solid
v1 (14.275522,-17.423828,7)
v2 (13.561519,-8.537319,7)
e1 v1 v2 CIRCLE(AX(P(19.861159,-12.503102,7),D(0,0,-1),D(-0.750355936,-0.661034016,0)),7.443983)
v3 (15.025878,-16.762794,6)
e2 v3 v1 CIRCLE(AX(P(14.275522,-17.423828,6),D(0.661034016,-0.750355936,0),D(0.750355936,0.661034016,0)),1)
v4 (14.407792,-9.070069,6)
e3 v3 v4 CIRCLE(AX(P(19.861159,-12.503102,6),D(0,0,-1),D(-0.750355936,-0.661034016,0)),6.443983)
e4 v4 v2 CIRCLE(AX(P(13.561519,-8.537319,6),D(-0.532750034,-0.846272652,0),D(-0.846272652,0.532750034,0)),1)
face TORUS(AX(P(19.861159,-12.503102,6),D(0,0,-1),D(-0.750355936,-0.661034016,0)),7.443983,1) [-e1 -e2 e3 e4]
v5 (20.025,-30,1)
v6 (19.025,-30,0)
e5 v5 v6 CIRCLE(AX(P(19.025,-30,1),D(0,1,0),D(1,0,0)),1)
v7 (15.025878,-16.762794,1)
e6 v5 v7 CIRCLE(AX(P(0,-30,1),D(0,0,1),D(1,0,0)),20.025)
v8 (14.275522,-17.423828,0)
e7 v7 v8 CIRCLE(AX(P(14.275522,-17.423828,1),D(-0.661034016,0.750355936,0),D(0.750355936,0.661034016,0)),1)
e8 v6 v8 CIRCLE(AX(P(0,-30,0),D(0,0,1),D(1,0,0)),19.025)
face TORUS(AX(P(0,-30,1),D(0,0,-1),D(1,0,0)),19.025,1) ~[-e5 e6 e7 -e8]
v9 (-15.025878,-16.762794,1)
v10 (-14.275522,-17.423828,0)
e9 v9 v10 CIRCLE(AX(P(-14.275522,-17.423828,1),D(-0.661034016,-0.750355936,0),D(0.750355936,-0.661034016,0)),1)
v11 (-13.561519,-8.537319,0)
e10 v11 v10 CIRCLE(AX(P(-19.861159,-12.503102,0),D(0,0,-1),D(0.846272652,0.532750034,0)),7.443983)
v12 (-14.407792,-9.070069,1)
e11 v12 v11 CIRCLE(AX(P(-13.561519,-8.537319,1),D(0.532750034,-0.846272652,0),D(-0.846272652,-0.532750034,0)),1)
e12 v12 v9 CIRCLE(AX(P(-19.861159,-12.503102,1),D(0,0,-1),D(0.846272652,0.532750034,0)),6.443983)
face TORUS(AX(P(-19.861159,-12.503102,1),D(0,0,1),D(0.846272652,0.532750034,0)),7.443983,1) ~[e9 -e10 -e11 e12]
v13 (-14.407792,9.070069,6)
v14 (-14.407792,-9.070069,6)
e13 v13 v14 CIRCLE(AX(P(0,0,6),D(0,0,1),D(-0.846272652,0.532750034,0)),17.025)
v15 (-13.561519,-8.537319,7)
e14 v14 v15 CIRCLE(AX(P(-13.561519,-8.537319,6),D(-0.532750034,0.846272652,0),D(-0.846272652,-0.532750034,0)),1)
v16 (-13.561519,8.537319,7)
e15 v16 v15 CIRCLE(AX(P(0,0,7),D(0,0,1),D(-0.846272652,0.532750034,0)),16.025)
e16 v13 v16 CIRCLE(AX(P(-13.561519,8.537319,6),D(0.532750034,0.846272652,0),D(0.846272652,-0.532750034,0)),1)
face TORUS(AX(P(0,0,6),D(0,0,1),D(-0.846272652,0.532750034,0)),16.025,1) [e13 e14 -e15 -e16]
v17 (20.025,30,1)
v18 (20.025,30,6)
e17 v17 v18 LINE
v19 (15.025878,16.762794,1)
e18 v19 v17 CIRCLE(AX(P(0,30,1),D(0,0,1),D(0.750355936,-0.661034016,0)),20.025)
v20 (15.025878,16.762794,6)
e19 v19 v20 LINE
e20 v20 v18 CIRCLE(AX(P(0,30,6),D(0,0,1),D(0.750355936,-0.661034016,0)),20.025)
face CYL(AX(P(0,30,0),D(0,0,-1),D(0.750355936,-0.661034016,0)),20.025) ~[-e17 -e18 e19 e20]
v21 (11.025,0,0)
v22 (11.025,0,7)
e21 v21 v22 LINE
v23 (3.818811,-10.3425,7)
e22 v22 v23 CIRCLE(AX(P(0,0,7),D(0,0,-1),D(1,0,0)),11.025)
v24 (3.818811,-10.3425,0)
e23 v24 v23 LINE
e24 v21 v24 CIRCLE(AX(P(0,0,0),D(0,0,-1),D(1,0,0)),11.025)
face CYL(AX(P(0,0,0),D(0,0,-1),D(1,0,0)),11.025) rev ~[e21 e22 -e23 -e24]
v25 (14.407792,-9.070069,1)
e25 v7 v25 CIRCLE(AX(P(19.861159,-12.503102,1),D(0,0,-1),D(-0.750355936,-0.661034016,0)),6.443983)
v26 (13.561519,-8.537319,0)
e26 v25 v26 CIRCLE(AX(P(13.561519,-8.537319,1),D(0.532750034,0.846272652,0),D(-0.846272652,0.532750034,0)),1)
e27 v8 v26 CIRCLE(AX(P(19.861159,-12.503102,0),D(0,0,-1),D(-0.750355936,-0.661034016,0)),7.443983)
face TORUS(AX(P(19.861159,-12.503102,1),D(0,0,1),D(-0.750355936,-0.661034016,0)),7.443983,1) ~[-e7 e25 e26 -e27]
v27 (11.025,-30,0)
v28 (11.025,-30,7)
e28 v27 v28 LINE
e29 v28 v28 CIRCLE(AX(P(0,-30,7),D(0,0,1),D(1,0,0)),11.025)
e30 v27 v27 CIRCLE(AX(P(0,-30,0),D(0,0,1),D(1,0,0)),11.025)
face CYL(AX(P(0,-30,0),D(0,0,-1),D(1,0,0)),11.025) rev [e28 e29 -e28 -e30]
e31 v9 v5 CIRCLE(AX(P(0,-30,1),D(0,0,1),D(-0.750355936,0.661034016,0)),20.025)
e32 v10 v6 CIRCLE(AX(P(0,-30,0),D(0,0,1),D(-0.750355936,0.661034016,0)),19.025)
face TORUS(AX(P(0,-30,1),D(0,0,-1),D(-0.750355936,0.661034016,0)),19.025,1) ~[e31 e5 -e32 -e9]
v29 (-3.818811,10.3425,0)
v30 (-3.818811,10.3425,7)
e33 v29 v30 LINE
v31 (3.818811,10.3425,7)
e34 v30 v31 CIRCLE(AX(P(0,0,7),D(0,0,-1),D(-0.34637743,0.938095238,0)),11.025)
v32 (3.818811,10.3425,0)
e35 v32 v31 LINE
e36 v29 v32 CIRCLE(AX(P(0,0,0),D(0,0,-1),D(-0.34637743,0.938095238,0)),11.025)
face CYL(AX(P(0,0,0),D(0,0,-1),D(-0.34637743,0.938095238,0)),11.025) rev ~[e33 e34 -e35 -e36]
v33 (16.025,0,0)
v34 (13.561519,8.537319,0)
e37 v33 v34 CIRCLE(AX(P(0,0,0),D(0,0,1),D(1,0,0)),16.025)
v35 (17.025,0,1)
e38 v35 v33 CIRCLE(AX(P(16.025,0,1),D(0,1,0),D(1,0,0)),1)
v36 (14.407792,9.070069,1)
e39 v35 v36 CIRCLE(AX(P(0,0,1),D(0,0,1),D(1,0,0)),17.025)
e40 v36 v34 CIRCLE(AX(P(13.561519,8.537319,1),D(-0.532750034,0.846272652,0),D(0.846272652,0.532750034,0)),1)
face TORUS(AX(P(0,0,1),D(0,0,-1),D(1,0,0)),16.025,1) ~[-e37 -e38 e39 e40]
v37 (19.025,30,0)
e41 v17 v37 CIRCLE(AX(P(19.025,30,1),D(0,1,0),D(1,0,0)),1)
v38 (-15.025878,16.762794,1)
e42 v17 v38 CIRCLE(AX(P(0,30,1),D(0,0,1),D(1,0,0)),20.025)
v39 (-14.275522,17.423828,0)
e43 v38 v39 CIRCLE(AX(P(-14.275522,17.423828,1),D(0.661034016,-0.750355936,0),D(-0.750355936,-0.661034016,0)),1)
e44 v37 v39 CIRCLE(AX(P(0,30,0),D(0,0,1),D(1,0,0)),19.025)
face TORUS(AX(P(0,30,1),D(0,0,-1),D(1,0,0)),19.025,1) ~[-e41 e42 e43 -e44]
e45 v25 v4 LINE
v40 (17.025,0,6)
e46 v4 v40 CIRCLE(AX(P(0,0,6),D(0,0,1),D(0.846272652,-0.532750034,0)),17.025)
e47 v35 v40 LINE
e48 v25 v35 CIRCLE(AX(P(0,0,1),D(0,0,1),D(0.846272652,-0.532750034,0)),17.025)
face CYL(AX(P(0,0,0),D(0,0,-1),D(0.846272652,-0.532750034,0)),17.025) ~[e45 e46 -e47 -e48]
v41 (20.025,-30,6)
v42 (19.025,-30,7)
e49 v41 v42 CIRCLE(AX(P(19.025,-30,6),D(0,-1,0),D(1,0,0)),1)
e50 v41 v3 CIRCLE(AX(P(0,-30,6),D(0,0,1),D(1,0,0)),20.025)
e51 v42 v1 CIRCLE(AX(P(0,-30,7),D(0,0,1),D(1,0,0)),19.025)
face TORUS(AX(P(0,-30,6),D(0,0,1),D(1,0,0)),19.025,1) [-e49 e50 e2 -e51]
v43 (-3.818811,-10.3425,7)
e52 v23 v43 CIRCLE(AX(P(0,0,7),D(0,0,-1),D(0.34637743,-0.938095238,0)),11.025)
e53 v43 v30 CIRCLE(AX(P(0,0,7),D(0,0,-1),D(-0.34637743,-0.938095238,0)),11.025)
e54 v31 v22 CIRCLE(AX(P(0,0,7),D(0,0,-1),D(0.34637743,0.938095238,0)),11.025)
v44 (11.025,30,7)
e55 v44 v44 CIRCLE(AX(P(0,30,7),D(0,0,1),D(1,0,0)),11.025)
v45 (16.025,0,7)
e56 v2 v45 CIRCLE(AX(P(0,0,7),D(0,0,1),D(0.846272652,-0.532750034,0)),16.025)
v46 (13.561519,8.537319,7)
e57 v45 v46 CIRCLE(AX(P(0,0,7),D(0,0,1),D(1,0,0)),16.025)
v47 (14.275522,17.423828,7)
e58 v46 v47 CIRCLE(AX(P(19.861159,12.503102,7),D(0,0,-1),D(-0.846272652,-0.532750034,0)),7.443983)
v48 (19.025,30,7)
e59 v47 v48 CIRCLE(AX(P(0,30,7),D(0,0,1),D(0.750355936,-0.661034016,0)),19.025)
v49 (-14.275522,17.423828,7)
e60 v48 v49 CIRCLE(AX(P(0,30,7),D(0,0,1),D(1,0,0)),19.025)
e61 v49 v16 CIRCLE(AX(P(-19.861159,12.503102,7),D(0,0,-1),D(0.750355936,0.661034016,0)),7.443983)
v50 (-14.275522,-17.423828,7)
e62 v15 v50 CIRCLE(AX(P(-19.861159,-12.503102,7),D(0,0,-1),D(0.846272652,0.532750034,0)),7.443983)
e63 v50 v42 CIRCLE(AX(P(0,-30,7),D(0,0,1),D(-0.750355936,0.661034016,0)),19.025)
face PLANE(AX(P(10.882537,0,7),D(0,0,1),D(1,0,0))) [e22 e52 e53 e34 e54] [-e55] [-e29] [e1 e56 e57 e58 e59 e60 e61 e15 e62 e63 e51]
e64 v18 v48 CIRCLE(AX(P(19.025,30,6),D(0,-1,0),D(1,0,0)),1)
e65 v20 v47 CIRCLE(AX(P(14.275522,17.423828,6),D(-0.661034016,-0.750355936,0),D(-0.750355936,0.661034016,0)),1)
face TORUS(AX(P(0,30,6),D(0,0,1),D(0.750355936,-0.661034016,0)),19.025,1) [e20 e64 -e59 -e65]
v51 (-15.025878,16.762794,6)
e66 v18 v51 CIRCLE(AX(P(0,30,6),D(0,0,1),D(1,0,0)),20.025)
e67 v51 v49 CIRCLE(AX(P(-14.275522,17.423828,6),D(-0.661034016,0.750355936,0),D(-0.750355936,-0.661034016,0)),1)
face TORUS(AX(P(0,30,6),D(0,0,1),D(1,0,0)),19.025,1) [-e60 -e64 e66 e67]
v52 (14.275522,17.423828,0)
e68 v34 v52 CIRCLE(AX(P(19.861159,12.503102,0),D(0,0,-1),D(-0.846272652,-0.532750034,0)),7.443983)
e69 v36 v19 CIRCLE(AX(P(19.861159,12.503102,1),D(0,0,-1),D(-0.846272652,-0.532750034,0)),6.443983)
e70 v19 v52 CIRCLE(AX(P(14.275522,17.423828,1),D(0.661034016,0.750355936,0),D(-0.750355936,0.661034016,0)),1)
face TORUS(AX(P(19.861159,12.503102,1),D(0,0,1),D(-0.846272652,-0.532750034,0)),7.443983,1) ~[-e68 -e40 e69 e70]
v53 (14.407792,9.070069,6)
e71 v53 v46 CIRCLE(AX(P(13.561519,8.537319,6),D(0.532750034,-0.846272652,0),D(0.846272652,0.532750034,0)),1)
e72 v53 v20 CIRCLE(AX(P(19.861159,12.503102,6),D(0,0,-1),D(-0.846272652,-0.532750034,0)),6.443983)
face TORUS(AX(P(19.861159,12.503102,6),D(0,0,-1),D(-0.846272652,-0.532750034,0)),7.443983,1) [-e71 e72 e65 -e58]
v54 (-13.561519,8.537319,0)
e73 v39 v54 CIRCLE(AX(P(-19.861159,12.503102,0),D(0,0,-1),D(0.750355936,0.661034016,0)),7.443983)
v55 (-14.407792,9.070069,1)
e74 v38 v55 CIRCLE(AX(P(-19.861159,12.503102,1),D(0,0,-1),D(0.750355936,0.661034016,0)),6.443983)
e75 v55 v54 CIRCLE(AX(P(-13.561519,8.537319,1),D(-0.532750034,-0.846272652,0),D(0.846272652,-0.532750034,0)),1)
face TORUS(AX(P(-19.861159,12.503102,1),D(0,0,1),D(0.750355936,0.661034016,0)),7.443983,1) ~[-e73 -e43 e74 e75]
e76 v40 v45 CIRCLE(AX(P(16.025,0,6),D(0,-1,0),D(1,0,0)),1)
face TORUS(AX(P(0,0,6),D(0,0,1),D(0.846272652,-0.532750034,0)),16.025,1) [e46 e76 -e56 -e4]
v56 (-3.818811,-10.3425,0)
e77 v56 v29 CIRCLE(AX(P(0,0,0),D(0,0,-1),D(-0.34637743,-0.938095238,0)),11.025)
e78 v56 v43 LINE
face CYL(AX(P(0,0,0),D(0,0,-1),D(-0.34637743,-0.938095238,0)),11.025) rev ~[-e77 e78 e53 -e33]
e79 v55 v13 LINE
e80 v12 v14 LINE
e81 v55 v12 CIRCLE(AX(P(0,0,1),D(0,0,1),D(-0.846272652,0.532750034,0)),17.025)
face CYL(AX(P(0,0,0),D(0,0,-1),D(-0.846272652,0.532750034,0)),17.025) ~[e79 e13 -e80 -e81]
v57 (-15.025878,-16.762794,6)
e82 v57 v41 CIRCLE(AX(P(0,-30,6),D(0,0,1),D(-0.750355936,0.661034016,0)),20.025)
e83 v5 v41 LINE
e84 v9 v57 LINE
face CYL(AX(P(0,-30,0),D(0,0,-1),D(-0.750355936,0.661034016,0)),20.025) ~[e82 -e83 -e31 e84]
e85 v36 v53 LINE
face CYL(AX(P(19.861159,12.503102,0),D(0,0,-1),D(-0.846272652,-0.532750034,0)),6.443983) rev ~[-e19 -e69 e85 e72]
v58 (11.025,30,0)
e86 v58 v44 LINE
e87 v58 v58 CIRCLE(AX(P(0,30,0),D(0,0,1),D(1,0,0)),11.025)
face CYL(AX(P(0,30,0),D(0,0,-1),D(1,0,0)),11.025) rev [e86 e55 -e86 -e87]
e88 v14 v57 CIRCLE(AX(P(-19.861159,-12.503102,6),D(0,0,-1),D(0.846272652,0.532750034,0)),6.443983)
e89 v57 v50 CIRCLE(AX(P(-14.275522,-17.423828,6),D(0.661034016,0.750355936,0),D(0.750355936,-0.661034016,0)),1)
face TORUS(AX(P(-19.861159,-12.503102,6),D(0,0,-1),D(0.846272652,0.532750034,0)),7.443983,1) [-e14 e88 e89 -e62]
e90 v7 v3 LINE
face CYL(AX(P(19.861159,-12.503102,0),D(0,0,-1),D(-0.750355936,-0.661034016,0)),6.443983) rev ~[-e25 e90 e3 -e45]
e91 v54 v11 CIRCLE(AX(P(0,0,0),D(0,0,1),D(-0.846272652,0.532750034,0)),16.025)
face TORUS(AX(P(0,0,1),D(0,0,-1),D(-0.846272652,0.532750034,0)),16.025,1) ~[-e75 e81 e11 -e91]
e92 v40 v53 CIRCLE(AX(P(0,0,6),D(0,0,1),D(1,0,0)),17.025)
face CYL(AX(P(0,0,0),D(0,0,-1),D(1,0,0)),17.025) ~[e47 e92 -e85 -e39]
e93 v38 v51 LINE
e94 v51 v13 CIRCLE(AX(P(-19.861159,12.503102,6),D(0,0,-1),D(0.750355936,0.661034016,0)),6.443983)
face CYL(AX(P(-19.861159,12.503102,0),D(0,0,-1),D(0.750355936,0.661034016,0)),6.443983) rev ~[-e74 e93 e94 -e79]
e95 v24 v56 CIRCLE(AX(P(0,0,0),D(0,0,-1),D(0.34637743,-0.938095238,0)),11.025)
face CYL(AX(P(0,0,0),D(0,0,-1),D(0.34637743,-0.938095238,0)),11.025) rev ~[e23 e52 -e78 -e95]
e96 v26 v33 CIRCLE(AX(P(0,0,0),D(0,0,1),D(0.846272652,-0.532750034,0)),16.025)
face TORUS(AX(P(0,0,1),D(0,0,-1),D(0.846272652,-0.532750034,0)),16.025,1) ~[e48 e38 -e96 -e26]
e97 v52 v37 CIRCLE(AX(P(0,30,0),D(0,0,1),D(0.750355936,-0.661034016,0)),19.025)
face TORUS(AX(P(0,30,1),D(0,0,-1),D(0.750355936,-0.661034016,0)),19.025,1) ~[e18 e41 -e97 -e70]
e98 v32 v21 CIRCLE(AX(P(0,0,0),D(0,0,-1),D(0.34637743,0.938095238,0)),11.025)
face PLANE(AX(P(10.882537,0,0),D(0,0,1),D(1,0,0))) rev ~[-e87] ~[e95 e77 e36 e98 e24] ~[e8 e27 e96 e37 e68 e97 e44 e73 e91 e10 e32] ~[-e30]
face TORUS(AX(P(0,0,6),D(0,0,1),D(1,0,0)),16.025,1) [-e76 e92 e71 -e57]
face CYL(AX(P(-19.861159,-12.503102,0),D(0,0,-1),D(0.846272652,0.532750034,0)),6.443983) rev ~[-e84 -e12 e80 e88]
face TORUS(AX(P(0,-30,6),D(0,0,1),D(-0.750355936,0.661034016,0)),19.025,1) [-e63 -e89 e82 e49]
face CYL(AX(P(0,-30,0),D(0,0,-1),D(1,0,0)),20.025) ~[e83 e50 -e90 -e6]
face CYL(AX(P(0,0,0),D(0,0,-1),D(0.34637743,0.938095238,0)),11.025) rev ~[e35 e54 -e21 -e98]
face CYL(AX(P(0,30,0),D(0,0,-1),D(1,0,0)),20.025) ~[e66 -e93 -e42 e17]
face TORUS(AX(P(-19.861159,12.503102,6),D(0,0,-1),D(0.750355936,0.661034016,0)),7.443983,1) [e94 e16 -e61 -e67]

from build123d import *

# Parameters (mm, degrees)
F0_R     = 11.025
F1_DEPTH = 7
F2_R     = 1


# Not quite as in the source:
# - a feature names something its author has since deleted; it is built from what else it names


with BuildPart() as f1:
    # F0 (on Top) → F1 (new body)
    with BuildSketch(Plane.XY):
        with BuildLine():
            ThreePointArc((3.8188111697, 10.3425), (9.045800632, 6.3027070317), (11.025, 0))
            ThreePointArc((11.025, 0), (9.045800632, -6.3027070317), (3.8188111697, -10.3425))
            ThreePointArc((3.8188111697, -10.3425), (7.4507812466, -11.4127332882), (10.8163704055, -13.1475))
            ThreePointArc((10.8163704055, -13.1475), (12.7757955184, -11.2529851094), (14.4077918935, -9.0700693357))
            ThreePointArc((14.4077918935, -9.0700693357), (16.3576172162, -4.7200618647), (17.025, 0))
            ThreePointArc((17.025, 0), (16.3576172162, 4.7200618647), (14.4077918935, 9.0700693357))
            ThreePointArc((14.4077918935, 9.0700693357), (12.7757955184, 11.2529851094), (10.8163704055, 13.1475))
            ThreePointArc((10.8163704055, 13.1475), (7.4507812466, 11.4127332882), (3.8188111697, 10.3425))
        make_face()
        with BuildLine():
            ThreePointArc((-3.8188111697, -10.3425), (-11.025, 0), (-3.8188111697, 10.3425))
            ThreePointArc((-3.8188111697, 10.3425), (-7.4507812466, 11.4127332882), (-10.8163704055, 13.1475))
            ThreePointArc((-10.8163704055, 13.1475), (-12.7757955184, 11.2529851094), (-14.4077918935, 9.0700693357))
            ThreePointArc((-14.4077918935, 9.0700693357), (-17.025, 0), (-14.4077918935, -9.0700693357))
            ThreePointArc((-14.4077918935, -9.0700693357), (-12.7757955184, -11.2529851094), (-10.8163704055, -13.1475))
            ThreePointArc((-10.8163704055, -13.1475), (-7.4507812466, -11.4127332882), (-3.8188111697, -10.3425))
        make_face()
        with BuildLine():
            ThreePointArc((-10.8163704055, 13.1475), (0, 17.025), (10.8163704055, 13.1475))
            ThreePointArc((10.8163704055, 13.1475), (13.0469549327, 14.808634295), (15.0258776109, 16.7627938362))
            ThreePointArc((15.0258776109, 16.7627938362), (18.7335771298, 22.9251351305), (20.025, 30))
            ThreePointArc((20.025, 30), (-7.0748648695, 48.7335771298), (-15.0258776109, 16.7627938362))
            ThreePointArc((-15.0258776109, 16.7627938362), (-13.0469549327, 14.808634295), (-10.8163704055, 13.1475))
        make_face()
        with Locations((0, 30)):
            Circle(F0_R, mode=Mode.SUBTRACT)
        with BuildLine():
            ThreePointArc((15.0258776109, 16.7627938362), (13.0469549327, 14.808634295), (10.8163704055, 13.1475))
            ThreePointArc((10.8163704055, 13.1475), (12.7757955184, 11.2529851094), (14.4077918935, 9.0700693357))
            ThreePointArc((14.4077918935, 9.0700693357), (13.4378751676, 13.0191918827), (15.0258776109, 16.7627938362))
        make_face()
        with BuildLine():
            ThreePointArc((15.0258776109, -16.7627938362), (13.0469549327, -14.808634295), (10.8163704055, -13.1475))
            ThreePointArc((10.8163704055, -13.1475), (0, -17.025), (-10.8163704055, -13.1475))
            ThreePointArc((-10.8163704055, -13.1475), (-13.0469549327, -14.808634295), (-15.0258776109, -16.7627938362))
            ThreePointArc((-15.0258776109, -16.7627938362), (-7.0748648695, -48.7335771298), (20.025, -30))
            ThreePointArc((20.025, -30), (18.7335771298, -22.9251351305), (15.0258776109, -16.7627938362))
        make_face()
        with Locations((0, -30)):
            Circle(F0_R, mode=Mode.SUBTRACT)
        with BuildLine():
            ThreePointArc((14.4077918935, -9.0700693357), (12.7757955184, -11.2529851094), (10.8163704055, -13.1475))
            ThreePointArc((10.8163704055, -13.1475), (13.0469549327, -14.808634295), (15.0258776109, -16.7627938362))
            ThreePointArc((15.0258776109, -16.7627938362), (13.4378751676, -13.0191918827), (14.4077918935, -9.0700693357))
        make_face()
        with BuildLine():
            ThreePointArc((-14.4077918935, 9.0700693357), (-12.7757955184, 11.2529851094), (-10.8163704055, 13.1475))
            ThreePointArc((-10.8163704055, 13.1475), (-13.0469549327, 14.808634295), (-15.0258776109, 16.7627938362))
            ThreePointArc((-15.0258776109, 16.7627938362), (-13.4378751676, 13.0191918827), (-14.4077918935, 9.0700693357))
        make_face()
        with BuildLine():
            ThreePointArc((-15.0258776109, -16.7627938362), (-13.0469549327, -14.808634295), (-10.8163704055, -13.1475))
            ThreePointArc((-10.8163704055, -13.1475), (-12.7757955184, -11.2529851094), (-14.4077918935, -9.0700693357))
            ThreePointArc((-14.4077918935, -9.0700693357), (-13.4378751676, -13.0191918827), (-15.0258776109, -16.7627938362))
        make_face()
        with BuildLine():
            ThreePointArc((-3.8188111697, 10.3425), (0, 11.025), (3.8188111697, 10.3425))
            ThreePointArc((3.8188111697, 10.3425), (7.4507812466, 11.4127332882), (10.8163704055, 13.1475))
            ThreePointArc((10.8163704055, 13.1475), (0, 17.025), (-10.8163704055, 13.1475))
            ThreePointArc((-10.8163704055, 13.1475), (-7.4507812466, 11.4127332882), (-3.8188111697, 10.3425))
        make_face()
        with BuildLine():
            ThreePointArc((10.8163704055, -13.1475), (7.4507812466, -11.4127332882), (3.8188111697, -10.3425))
            ThreePointArc((3.8188111697, -10.3425), (0, -11.025), (-3.8188111697, -10.3425))
            ThreePointArc((-3.8188111697, -10.3425), (-7.4507812466, -11.4127332882), (-10.8163704055, -13.1475))
            ThreePointArc((-10.8163704055, -13.1475), (0, -17.025), (10.8163704055, -13.1475))
        make_face()
    extrude(amount=F1_DEPTH)

    # F2
    f2_edges = [f1.edges().sort_by_distance(p)[0] for p in [
        (15.025878, 16.762794, 3.5),
        (-15.025878, 16.762794, 3.5),
        (0, 50.025, 0),
        (0, 50.025, 7),
        (-14.407792, 9.070069, 3.5),
        (-13.437875, 13.019192, 0),
        (-13.437875, 13.019192, 7),
        (-14.407792, -9.070069, 3.5),
        (-15.025878, -16.762794, 3.5),
        (-13.437875, -13.019192, 0),
        (-13.437875, -13.019192, 7),
        (15.025878, -16.762794, 3.5),
        (0, -50.025, 0),
        (0, -50.025, 7),
    ]]
    fillet(f2_edges, radius=F2_R)


solid = f1.part
